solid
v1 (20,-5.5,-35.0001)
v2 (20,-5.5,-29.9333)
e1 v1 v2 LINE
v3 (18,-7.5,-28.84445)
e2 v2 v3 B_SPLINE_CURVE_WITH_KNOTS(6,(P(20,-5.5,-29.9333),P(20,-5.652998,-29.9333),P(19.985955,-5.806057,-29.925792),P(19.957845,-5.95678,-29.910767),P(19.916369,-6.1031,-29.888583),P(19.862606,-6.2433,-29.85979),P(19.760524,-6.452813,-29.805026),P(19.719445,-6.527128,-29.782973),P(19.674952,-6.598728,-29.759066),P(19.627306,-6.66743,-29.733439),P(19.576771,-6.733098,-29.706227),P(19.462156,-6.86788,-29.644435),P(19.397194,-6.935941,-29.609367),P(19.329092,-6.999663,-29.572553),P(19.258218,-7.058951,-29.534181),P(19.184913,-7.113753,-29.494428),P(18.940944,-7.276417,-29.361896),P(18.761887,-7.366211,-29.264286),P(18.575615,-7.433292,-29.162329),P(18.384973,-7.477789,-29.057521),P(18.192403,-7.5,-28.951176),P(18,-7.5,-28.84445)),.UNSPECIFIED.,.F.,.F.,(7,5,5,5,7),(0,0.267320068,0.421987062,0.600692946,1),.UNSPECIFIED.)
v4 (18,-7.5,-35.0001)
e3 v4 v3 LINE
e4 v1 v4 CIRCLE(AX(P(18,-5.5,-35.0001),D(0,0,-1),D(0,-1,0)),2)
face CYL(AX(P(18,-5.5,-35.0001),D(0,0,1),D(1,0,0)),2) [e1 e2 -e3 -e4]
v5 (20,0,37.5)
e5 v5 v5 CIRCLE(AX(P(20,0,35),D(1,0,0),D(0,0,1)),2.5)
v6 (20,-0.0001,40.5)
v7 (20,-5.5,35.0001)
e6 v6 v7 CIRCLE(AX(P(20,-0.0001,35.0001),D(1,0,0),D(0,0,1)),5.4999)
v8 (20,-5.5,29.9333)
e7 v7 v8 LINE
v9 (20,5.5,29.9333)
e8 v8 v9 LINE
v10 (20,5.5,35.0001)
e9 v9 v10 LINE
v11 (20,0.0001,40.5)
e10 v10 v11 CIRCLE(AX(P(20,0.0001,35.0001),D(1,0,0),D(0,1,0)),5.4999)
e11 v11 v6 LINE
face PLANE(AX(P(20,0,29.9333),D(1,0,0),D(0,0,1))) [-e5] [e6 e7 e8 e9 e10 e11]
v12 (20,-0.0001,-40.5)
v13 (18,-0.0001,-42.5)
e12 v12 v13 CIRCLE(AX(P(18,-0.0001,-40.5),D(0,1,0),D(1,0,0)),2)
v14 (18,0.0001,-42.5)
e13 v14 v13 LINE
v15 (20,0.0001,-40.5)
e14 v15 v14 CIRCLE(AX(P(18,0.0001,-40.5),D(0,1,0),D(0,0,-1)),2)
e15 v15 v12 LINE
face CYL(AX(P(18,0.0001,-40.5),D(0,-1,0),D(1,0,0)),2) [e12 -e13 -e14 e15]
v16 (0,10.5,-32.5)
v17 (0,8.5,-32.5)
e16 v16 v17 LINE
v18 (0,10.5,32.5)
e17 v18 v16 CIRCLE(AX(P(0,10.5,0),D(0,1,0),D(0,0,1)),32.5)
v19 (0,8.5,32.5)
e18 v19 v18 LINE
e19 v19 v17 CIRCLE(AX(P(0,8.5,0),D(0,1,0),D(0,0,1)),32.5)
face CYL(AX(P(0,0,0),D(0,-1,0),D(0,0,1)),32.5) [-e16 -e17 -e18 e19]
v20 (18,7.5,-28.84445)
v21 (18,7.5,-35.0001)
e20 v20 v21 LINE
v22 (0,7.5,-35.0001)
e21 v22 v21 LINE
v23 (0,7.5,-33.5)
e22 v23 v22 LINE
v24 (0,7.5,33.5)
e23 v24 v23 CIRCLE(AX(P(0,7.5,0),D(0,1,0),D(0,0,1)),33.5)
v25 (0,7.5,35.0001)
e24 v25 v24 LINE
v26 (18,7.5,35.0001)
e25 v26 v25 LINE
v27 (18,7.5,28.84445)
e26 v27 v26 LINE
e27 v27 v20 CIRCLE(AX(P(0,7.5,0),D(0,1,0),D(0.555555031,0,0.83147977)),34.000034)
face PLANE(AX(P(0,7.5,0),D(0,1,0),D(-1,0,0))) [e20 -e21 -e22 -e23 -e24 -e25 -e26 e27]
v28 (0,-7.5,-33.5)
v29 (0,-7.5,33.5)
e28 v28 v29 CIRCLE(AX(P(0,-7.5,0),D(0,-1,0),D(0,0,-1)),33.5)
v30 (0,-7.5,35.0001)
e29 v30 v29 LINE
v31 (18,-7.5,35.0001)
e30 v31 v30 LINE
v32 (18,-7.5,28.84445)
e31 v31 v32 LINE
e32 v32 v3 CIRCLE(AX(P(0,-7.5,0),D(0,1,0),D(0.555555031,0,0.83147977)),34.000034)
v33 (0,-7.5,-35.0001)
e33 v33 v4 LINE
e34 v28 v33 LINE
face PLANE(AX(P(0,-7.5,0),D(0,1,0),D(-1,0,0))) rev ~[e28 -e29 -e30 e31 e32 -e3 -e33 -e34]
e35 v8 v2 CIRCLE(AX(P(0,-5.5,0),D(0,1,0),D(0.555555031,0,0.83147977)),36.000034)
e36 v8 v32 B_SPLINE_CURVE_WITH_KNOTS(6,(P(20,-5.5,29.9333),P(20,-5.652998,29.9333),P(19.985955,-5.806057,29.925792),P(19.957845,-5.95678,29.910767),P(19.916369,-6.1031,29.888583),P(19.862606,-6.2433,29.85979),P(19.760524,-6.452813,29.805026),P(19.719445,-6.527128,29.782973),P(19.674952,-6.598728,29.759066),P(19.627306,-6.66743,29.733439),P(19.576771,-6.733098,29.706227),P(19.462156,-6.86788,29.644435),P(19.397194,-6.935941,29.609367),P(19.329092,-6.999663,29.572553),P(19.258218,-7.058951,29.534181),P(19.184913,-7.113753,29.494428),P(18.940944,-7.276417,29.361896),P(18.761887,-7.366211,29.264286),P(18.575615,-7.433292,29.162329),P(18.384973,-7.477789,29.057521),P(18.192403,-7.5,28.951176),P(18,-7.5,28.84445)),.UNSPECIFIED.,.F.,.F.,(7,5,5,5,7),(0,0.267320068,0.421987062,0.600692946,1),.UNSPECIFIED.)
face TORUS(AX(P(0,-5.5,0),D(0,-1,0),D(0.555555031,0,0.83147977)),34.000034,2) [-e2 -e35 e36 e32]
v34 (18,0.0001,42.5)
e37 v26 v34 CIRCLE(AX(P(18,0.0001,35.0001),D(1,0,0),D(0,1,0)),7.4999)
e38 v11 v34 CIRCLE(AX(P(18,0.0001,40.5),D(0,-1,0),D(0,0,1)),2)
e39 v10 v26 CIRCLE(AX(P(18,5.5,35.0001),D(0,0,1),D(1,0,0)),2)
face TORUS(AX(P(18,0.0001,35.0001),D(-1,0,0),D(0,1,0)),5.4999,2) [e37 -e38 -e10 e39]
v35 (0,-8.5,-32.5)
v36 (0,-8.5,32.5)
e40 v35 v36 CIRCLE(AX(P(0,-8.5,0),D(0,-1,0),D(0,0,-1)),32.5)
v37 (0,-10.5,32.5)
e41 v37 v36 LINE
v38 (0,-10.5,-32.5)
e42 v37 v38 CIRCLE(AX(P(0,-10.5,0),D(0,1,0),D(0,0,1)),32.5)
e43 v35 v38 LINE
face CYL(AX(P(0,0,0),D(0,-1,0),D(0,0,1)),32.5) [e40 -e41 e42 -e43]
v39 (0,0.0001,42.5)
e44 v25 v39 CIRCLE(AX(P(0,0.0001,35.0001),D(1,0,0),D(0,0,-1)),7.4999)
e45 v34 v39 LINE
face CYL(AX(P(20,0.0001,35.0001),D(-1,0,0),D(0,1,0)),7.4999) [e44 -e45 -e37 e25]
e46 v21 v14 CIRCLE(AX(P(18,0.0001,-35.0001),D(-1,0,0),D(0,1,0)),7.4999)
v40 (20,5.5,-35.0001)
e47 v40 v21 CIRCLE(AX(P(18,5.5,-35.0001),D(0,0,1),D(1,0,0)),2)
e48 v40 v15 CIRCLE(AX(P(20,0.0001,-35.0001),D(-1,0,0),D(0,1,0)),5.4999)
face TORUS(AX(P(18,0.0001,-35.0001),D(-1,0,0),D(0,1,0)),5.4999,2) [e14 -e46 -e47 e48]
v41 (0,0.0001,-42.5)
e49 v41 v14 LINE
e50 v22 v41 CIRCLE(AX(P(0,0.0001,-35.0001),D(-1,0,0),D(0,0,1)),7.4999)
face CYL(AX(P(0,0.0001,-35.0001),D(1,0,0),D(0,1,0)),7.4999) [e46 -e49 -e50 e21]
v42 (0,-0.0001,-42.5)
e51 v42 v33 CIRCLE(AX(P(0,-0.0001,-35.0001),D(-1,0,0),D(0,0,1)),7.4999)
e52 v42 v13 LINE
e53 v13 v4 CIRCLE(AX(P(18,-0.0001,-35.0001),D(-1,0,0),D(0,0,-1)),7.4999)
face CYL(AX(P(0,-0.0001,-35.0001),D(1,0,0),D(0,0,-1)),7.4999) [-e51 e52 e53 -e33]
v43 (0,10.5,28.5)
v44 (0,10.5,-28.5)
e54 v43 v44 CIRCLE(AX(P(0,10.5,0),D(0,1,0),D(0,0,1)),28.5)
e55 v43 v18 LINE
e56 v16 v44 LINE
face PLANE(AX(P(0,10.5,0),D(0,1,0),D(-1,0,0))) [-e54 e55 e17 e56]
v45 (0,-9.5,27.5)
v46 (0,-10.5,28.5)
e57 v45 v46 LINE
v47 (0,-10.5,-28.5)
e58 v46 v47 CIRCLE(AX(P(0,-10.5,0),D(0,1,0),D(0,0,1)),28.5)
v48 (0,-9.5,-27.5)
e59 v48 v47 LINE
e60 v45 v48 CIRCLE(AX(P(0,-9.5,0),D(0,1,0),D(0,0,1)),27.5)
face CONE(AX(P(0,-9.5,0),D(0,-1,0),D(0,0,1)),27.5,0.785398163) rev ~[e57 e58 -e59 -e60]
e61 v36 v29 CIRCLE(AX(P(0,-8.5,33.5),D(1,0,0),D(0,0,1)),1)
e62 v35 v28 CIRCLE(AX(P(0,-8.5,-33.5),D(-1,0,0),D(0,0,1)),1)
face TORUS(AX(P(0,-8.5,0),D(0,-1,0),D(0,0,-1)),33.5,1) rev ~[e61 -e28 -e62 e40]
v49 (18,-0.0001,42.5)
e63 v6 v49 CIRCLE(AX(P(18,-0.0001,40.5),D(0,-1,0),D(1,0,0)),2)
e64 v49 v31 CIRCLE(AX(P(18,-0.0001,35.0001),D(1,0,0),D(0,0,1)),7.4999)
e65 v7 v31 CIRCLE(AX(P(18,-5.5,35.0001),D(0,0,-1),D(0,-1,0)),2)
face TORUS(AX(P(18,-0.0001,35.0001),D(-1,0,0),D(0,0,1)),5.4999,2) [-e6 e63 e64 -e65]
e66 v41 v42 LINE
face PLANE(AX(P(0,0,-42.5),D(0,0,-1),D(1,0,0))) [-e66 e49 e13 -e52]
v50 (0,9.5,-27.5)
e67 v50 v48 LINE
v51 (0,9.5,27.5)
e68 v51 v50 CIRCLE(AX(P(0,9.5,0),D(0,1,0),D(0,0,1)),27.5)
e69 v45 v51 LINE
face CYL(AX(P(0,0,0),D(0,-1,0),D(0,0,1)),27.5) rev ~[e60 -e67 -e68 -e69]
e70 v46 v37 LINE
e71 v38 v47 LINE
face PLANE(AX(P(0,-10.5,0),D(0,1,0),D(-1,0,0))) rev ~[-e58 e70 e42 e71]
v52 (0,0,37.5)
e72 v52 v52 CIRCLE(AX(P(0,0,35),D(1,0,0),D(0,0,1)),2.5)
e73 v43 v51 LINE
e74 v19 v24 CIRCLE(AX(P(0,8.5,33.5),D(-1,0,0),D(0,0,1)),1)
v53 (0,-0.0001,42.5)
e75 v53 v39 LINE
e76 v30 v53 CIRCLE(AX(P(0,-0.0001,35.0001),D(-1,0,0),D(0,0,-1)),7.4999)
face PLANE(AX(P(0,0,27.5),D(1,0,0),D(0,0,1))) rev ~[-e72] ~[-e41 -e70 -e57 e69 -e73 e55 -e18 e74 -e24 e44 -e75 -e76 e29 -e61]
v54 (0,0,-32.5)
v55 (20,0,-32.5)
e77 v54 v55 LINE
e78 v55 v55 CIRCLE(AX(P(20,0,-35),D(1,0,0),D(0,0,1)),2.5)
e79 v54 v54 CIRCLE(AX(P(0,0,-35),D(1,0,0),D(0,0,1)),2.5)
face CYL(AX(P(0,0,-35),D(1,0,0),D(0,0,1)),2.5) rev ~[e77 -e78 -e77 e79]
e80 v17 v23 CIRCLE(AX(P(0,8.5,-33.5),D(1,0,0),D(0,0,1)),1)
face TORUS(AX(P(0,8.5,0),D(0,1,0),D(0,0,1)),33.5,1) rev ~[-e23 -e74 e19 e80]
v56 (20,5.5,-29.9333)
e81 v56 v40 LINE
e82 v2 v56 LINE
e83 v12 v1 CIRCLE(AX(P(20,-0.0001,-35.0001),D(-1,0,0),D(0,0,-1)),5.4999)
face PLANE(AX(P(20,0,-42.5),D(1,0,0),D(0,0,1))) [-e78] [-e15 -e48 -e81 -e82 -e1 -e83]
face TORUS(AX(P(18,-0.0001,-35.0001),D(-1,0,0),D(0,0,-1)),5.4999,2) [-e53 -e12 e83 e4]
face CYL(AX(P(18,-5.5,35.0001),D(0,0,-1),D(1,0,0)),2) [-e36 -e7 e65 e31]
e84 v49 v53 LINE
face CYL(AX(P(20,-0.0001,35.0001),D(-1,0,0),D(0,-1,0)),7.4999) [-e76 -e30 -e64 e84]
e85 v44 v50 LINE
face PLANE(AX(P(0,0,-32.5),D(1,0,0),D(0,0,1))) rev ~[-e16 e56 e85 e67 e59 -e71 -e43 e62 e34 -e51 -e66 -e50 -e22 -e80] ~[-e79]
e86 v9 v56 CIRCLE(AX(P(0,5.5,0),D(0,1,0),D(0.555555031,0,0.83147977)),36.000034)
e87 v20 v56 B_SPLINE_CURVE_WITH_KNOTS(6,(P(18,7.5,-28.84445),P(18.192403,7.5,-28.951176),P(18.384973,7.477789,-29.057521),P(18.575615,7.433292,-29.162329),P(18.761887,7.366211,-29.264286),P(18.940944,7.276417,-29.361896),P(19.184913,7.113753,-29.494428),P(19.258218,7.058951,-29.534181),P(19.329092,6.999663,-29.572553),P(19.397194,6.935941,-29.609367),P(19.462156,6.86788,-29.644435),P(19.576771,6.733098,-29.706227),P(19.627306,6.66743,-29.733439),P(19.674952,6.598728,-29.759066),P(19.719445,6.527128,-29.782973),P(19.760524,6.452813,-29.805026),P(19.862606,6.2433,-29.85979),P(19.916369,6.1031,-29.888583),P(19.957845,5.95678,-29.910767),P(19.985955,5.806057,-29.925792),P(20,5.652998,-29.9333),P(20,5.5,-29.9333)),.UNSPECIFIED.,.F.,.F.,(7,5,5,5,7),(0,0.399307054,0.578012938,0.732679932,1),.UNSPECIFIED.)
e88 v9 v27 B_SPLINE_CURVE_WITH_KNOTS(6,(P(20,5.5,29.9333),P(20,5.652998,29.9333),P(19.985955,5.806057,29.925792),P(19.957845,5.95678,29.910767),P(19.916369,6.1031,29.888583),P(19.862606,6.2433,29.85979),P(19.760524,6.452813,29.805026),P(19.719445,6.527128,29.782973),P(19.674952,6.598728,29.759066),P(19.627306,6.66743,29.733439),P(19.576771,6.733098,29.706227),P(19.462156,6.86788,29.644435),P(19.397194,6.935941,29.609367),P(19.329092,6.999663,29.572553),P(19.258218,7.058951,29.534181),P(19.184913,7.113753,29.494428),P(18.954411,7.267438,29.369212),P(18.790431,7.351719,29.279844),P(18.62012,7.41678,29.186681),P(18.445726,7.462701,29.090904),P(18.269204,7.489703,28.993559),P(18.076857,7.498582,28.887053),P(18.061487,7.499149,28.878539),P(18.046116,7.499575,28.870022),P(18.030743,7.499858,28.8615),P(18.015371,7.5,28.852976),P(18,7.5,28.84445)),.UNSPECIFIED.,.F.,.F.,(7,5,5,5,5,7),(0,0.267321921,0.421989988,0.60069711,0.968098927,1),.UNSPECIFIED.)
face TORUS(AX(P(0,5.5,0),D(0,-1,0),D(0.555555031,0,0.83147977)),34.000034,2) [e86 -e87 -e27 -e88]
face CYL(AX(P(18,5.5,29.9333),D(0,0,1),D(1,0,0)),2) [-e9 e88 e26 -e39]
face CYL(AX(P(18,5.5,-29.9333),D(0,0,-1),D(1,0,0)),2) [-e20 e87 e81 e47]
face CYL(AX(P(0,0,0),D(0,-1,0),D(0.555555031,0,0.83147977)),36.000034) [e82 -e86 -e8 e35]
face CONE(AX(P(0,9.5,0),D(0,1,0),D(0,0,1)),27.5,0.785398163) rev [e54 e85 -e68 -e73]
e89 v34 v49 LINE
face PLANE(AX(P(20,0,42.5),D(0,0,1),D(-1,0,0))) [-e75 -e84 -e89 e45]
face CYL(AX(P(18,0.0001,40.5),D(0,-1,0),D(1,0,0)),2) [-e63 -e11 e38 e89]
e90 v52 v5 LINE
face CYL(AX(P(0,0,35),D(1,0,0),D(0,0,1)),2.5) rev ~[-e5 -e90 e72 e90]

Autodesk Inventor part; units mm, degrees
ref_plane "YZ Plane" through (0, 0, 0) normal (1, 0, 0) x (0, 1, 0)
ref_plane "XZ Plane" through (0, 0, 0) normal (0, 1, 0) x (-1, 0, 0)
ref_plane "XY Plane" through (0, 0, 0) normal (0, 0, 1) x (1, 0, 0)
sketch "Sketch1" plane through (0, 0, 0) normal (0, 1, 0) x (-1, 0, 0)
  arc A0 (0, 27.5) -> (0, -27.5) centre (0, 0) ccw
  arc A1 (0, 32.5) -> (0, -32.5) centre (0, 0) ccw
  line L0 (0, -32.5) -> (0, -42.5)
  line L1 (0, -42.5) -> (-20, -42.5)
  line L2 (-20, -42.5) -> (-20, -25.6174)
  line L3 (-20, 25.6174) -> (-20, 42.5)
  line L4 (-20, 42.5) -> (0, 42.5)
  line L5 (0, 42.5) -> (0, 32.5)
  line L6 (0, -32.5) -> (0, -27.5)
  line L7 (0, 27.5) -> (0, 32.5)
  arc A2 (-20, 29.9333) -> (-20, -29.9333) centre (0, 0) ccw
  dimension "d0" = 27.5
  dimension "d1" = 32.5
  dimension "d2" = 10
  dimension "d3" = 20
  dimension "d4" = 36
extrude "Extrusion1" add sketch "Sketch1" along normal mid plane 21 contours A0 L6 A1 L7
extrude "Extrusion2" add sketch "Sketch1" along normal mid plane 15 contours A1 L3 L4 L5 | L0 L1 L2 A1 | A1 L2 A2 L3
sketch "Sketch2" plane through (0, -10.5, -27.5) normal (-1, 0, 0) x (0, 0, 1)
  line L0 (0, 21) -> (0, 0) projected
  line L1 (55, 0) -> (55, 21) projected
  point P0 (27.5, 10.5)
  point P1 (-7.5, 10.5)
  point P2 (62.5, 10.5)
  dimension "d9" = 7.5
  dimension "d10" = 7.5
hole "Hole1" at (0, 0, -35) at (0, 0, 35) direction (1, 0, 0) diameter 5 end through all
full round fillet "Full Round Fillet1" first side at (9.2593, 7.5, 38.8519) centre faces at (13.3333, -2.5, -42.5) second side at (9.2593, -7.5, 38.8519)
full round fillet "Full Round Fillet2" first side at (9.2593, -7.5, 38.8519) centre faces at (6.6667, -2.5, 42.5) second side at (9.2593, 7.5, 38.8519)
fillet "Fillet1" radius 2 10 edges at (36, -7.5, 0) (20, 5.3033, 40.3033) (20, -5.3033, 40.3033) (20, 7.5, 32.4667) (20, -7.5, 32.4667) (36, 7.5, 0) (20, -7.5, -32.4667) (20, 7.5, -32.4667) (20, 5.3033, -40.3033) (20, -5.3033, -40.3033)
chamfer "Chamfer1" distance 1 angle 45 2 edges at (27.5, -10.5, 0) (27.5, 10.5, 0)
fillet "Fillet2" radius 1 2 edges at (32.5, 7.5, 0) (32.5, -7.5, 0)
properties part number "Pokrywa stopy korbowodu"
